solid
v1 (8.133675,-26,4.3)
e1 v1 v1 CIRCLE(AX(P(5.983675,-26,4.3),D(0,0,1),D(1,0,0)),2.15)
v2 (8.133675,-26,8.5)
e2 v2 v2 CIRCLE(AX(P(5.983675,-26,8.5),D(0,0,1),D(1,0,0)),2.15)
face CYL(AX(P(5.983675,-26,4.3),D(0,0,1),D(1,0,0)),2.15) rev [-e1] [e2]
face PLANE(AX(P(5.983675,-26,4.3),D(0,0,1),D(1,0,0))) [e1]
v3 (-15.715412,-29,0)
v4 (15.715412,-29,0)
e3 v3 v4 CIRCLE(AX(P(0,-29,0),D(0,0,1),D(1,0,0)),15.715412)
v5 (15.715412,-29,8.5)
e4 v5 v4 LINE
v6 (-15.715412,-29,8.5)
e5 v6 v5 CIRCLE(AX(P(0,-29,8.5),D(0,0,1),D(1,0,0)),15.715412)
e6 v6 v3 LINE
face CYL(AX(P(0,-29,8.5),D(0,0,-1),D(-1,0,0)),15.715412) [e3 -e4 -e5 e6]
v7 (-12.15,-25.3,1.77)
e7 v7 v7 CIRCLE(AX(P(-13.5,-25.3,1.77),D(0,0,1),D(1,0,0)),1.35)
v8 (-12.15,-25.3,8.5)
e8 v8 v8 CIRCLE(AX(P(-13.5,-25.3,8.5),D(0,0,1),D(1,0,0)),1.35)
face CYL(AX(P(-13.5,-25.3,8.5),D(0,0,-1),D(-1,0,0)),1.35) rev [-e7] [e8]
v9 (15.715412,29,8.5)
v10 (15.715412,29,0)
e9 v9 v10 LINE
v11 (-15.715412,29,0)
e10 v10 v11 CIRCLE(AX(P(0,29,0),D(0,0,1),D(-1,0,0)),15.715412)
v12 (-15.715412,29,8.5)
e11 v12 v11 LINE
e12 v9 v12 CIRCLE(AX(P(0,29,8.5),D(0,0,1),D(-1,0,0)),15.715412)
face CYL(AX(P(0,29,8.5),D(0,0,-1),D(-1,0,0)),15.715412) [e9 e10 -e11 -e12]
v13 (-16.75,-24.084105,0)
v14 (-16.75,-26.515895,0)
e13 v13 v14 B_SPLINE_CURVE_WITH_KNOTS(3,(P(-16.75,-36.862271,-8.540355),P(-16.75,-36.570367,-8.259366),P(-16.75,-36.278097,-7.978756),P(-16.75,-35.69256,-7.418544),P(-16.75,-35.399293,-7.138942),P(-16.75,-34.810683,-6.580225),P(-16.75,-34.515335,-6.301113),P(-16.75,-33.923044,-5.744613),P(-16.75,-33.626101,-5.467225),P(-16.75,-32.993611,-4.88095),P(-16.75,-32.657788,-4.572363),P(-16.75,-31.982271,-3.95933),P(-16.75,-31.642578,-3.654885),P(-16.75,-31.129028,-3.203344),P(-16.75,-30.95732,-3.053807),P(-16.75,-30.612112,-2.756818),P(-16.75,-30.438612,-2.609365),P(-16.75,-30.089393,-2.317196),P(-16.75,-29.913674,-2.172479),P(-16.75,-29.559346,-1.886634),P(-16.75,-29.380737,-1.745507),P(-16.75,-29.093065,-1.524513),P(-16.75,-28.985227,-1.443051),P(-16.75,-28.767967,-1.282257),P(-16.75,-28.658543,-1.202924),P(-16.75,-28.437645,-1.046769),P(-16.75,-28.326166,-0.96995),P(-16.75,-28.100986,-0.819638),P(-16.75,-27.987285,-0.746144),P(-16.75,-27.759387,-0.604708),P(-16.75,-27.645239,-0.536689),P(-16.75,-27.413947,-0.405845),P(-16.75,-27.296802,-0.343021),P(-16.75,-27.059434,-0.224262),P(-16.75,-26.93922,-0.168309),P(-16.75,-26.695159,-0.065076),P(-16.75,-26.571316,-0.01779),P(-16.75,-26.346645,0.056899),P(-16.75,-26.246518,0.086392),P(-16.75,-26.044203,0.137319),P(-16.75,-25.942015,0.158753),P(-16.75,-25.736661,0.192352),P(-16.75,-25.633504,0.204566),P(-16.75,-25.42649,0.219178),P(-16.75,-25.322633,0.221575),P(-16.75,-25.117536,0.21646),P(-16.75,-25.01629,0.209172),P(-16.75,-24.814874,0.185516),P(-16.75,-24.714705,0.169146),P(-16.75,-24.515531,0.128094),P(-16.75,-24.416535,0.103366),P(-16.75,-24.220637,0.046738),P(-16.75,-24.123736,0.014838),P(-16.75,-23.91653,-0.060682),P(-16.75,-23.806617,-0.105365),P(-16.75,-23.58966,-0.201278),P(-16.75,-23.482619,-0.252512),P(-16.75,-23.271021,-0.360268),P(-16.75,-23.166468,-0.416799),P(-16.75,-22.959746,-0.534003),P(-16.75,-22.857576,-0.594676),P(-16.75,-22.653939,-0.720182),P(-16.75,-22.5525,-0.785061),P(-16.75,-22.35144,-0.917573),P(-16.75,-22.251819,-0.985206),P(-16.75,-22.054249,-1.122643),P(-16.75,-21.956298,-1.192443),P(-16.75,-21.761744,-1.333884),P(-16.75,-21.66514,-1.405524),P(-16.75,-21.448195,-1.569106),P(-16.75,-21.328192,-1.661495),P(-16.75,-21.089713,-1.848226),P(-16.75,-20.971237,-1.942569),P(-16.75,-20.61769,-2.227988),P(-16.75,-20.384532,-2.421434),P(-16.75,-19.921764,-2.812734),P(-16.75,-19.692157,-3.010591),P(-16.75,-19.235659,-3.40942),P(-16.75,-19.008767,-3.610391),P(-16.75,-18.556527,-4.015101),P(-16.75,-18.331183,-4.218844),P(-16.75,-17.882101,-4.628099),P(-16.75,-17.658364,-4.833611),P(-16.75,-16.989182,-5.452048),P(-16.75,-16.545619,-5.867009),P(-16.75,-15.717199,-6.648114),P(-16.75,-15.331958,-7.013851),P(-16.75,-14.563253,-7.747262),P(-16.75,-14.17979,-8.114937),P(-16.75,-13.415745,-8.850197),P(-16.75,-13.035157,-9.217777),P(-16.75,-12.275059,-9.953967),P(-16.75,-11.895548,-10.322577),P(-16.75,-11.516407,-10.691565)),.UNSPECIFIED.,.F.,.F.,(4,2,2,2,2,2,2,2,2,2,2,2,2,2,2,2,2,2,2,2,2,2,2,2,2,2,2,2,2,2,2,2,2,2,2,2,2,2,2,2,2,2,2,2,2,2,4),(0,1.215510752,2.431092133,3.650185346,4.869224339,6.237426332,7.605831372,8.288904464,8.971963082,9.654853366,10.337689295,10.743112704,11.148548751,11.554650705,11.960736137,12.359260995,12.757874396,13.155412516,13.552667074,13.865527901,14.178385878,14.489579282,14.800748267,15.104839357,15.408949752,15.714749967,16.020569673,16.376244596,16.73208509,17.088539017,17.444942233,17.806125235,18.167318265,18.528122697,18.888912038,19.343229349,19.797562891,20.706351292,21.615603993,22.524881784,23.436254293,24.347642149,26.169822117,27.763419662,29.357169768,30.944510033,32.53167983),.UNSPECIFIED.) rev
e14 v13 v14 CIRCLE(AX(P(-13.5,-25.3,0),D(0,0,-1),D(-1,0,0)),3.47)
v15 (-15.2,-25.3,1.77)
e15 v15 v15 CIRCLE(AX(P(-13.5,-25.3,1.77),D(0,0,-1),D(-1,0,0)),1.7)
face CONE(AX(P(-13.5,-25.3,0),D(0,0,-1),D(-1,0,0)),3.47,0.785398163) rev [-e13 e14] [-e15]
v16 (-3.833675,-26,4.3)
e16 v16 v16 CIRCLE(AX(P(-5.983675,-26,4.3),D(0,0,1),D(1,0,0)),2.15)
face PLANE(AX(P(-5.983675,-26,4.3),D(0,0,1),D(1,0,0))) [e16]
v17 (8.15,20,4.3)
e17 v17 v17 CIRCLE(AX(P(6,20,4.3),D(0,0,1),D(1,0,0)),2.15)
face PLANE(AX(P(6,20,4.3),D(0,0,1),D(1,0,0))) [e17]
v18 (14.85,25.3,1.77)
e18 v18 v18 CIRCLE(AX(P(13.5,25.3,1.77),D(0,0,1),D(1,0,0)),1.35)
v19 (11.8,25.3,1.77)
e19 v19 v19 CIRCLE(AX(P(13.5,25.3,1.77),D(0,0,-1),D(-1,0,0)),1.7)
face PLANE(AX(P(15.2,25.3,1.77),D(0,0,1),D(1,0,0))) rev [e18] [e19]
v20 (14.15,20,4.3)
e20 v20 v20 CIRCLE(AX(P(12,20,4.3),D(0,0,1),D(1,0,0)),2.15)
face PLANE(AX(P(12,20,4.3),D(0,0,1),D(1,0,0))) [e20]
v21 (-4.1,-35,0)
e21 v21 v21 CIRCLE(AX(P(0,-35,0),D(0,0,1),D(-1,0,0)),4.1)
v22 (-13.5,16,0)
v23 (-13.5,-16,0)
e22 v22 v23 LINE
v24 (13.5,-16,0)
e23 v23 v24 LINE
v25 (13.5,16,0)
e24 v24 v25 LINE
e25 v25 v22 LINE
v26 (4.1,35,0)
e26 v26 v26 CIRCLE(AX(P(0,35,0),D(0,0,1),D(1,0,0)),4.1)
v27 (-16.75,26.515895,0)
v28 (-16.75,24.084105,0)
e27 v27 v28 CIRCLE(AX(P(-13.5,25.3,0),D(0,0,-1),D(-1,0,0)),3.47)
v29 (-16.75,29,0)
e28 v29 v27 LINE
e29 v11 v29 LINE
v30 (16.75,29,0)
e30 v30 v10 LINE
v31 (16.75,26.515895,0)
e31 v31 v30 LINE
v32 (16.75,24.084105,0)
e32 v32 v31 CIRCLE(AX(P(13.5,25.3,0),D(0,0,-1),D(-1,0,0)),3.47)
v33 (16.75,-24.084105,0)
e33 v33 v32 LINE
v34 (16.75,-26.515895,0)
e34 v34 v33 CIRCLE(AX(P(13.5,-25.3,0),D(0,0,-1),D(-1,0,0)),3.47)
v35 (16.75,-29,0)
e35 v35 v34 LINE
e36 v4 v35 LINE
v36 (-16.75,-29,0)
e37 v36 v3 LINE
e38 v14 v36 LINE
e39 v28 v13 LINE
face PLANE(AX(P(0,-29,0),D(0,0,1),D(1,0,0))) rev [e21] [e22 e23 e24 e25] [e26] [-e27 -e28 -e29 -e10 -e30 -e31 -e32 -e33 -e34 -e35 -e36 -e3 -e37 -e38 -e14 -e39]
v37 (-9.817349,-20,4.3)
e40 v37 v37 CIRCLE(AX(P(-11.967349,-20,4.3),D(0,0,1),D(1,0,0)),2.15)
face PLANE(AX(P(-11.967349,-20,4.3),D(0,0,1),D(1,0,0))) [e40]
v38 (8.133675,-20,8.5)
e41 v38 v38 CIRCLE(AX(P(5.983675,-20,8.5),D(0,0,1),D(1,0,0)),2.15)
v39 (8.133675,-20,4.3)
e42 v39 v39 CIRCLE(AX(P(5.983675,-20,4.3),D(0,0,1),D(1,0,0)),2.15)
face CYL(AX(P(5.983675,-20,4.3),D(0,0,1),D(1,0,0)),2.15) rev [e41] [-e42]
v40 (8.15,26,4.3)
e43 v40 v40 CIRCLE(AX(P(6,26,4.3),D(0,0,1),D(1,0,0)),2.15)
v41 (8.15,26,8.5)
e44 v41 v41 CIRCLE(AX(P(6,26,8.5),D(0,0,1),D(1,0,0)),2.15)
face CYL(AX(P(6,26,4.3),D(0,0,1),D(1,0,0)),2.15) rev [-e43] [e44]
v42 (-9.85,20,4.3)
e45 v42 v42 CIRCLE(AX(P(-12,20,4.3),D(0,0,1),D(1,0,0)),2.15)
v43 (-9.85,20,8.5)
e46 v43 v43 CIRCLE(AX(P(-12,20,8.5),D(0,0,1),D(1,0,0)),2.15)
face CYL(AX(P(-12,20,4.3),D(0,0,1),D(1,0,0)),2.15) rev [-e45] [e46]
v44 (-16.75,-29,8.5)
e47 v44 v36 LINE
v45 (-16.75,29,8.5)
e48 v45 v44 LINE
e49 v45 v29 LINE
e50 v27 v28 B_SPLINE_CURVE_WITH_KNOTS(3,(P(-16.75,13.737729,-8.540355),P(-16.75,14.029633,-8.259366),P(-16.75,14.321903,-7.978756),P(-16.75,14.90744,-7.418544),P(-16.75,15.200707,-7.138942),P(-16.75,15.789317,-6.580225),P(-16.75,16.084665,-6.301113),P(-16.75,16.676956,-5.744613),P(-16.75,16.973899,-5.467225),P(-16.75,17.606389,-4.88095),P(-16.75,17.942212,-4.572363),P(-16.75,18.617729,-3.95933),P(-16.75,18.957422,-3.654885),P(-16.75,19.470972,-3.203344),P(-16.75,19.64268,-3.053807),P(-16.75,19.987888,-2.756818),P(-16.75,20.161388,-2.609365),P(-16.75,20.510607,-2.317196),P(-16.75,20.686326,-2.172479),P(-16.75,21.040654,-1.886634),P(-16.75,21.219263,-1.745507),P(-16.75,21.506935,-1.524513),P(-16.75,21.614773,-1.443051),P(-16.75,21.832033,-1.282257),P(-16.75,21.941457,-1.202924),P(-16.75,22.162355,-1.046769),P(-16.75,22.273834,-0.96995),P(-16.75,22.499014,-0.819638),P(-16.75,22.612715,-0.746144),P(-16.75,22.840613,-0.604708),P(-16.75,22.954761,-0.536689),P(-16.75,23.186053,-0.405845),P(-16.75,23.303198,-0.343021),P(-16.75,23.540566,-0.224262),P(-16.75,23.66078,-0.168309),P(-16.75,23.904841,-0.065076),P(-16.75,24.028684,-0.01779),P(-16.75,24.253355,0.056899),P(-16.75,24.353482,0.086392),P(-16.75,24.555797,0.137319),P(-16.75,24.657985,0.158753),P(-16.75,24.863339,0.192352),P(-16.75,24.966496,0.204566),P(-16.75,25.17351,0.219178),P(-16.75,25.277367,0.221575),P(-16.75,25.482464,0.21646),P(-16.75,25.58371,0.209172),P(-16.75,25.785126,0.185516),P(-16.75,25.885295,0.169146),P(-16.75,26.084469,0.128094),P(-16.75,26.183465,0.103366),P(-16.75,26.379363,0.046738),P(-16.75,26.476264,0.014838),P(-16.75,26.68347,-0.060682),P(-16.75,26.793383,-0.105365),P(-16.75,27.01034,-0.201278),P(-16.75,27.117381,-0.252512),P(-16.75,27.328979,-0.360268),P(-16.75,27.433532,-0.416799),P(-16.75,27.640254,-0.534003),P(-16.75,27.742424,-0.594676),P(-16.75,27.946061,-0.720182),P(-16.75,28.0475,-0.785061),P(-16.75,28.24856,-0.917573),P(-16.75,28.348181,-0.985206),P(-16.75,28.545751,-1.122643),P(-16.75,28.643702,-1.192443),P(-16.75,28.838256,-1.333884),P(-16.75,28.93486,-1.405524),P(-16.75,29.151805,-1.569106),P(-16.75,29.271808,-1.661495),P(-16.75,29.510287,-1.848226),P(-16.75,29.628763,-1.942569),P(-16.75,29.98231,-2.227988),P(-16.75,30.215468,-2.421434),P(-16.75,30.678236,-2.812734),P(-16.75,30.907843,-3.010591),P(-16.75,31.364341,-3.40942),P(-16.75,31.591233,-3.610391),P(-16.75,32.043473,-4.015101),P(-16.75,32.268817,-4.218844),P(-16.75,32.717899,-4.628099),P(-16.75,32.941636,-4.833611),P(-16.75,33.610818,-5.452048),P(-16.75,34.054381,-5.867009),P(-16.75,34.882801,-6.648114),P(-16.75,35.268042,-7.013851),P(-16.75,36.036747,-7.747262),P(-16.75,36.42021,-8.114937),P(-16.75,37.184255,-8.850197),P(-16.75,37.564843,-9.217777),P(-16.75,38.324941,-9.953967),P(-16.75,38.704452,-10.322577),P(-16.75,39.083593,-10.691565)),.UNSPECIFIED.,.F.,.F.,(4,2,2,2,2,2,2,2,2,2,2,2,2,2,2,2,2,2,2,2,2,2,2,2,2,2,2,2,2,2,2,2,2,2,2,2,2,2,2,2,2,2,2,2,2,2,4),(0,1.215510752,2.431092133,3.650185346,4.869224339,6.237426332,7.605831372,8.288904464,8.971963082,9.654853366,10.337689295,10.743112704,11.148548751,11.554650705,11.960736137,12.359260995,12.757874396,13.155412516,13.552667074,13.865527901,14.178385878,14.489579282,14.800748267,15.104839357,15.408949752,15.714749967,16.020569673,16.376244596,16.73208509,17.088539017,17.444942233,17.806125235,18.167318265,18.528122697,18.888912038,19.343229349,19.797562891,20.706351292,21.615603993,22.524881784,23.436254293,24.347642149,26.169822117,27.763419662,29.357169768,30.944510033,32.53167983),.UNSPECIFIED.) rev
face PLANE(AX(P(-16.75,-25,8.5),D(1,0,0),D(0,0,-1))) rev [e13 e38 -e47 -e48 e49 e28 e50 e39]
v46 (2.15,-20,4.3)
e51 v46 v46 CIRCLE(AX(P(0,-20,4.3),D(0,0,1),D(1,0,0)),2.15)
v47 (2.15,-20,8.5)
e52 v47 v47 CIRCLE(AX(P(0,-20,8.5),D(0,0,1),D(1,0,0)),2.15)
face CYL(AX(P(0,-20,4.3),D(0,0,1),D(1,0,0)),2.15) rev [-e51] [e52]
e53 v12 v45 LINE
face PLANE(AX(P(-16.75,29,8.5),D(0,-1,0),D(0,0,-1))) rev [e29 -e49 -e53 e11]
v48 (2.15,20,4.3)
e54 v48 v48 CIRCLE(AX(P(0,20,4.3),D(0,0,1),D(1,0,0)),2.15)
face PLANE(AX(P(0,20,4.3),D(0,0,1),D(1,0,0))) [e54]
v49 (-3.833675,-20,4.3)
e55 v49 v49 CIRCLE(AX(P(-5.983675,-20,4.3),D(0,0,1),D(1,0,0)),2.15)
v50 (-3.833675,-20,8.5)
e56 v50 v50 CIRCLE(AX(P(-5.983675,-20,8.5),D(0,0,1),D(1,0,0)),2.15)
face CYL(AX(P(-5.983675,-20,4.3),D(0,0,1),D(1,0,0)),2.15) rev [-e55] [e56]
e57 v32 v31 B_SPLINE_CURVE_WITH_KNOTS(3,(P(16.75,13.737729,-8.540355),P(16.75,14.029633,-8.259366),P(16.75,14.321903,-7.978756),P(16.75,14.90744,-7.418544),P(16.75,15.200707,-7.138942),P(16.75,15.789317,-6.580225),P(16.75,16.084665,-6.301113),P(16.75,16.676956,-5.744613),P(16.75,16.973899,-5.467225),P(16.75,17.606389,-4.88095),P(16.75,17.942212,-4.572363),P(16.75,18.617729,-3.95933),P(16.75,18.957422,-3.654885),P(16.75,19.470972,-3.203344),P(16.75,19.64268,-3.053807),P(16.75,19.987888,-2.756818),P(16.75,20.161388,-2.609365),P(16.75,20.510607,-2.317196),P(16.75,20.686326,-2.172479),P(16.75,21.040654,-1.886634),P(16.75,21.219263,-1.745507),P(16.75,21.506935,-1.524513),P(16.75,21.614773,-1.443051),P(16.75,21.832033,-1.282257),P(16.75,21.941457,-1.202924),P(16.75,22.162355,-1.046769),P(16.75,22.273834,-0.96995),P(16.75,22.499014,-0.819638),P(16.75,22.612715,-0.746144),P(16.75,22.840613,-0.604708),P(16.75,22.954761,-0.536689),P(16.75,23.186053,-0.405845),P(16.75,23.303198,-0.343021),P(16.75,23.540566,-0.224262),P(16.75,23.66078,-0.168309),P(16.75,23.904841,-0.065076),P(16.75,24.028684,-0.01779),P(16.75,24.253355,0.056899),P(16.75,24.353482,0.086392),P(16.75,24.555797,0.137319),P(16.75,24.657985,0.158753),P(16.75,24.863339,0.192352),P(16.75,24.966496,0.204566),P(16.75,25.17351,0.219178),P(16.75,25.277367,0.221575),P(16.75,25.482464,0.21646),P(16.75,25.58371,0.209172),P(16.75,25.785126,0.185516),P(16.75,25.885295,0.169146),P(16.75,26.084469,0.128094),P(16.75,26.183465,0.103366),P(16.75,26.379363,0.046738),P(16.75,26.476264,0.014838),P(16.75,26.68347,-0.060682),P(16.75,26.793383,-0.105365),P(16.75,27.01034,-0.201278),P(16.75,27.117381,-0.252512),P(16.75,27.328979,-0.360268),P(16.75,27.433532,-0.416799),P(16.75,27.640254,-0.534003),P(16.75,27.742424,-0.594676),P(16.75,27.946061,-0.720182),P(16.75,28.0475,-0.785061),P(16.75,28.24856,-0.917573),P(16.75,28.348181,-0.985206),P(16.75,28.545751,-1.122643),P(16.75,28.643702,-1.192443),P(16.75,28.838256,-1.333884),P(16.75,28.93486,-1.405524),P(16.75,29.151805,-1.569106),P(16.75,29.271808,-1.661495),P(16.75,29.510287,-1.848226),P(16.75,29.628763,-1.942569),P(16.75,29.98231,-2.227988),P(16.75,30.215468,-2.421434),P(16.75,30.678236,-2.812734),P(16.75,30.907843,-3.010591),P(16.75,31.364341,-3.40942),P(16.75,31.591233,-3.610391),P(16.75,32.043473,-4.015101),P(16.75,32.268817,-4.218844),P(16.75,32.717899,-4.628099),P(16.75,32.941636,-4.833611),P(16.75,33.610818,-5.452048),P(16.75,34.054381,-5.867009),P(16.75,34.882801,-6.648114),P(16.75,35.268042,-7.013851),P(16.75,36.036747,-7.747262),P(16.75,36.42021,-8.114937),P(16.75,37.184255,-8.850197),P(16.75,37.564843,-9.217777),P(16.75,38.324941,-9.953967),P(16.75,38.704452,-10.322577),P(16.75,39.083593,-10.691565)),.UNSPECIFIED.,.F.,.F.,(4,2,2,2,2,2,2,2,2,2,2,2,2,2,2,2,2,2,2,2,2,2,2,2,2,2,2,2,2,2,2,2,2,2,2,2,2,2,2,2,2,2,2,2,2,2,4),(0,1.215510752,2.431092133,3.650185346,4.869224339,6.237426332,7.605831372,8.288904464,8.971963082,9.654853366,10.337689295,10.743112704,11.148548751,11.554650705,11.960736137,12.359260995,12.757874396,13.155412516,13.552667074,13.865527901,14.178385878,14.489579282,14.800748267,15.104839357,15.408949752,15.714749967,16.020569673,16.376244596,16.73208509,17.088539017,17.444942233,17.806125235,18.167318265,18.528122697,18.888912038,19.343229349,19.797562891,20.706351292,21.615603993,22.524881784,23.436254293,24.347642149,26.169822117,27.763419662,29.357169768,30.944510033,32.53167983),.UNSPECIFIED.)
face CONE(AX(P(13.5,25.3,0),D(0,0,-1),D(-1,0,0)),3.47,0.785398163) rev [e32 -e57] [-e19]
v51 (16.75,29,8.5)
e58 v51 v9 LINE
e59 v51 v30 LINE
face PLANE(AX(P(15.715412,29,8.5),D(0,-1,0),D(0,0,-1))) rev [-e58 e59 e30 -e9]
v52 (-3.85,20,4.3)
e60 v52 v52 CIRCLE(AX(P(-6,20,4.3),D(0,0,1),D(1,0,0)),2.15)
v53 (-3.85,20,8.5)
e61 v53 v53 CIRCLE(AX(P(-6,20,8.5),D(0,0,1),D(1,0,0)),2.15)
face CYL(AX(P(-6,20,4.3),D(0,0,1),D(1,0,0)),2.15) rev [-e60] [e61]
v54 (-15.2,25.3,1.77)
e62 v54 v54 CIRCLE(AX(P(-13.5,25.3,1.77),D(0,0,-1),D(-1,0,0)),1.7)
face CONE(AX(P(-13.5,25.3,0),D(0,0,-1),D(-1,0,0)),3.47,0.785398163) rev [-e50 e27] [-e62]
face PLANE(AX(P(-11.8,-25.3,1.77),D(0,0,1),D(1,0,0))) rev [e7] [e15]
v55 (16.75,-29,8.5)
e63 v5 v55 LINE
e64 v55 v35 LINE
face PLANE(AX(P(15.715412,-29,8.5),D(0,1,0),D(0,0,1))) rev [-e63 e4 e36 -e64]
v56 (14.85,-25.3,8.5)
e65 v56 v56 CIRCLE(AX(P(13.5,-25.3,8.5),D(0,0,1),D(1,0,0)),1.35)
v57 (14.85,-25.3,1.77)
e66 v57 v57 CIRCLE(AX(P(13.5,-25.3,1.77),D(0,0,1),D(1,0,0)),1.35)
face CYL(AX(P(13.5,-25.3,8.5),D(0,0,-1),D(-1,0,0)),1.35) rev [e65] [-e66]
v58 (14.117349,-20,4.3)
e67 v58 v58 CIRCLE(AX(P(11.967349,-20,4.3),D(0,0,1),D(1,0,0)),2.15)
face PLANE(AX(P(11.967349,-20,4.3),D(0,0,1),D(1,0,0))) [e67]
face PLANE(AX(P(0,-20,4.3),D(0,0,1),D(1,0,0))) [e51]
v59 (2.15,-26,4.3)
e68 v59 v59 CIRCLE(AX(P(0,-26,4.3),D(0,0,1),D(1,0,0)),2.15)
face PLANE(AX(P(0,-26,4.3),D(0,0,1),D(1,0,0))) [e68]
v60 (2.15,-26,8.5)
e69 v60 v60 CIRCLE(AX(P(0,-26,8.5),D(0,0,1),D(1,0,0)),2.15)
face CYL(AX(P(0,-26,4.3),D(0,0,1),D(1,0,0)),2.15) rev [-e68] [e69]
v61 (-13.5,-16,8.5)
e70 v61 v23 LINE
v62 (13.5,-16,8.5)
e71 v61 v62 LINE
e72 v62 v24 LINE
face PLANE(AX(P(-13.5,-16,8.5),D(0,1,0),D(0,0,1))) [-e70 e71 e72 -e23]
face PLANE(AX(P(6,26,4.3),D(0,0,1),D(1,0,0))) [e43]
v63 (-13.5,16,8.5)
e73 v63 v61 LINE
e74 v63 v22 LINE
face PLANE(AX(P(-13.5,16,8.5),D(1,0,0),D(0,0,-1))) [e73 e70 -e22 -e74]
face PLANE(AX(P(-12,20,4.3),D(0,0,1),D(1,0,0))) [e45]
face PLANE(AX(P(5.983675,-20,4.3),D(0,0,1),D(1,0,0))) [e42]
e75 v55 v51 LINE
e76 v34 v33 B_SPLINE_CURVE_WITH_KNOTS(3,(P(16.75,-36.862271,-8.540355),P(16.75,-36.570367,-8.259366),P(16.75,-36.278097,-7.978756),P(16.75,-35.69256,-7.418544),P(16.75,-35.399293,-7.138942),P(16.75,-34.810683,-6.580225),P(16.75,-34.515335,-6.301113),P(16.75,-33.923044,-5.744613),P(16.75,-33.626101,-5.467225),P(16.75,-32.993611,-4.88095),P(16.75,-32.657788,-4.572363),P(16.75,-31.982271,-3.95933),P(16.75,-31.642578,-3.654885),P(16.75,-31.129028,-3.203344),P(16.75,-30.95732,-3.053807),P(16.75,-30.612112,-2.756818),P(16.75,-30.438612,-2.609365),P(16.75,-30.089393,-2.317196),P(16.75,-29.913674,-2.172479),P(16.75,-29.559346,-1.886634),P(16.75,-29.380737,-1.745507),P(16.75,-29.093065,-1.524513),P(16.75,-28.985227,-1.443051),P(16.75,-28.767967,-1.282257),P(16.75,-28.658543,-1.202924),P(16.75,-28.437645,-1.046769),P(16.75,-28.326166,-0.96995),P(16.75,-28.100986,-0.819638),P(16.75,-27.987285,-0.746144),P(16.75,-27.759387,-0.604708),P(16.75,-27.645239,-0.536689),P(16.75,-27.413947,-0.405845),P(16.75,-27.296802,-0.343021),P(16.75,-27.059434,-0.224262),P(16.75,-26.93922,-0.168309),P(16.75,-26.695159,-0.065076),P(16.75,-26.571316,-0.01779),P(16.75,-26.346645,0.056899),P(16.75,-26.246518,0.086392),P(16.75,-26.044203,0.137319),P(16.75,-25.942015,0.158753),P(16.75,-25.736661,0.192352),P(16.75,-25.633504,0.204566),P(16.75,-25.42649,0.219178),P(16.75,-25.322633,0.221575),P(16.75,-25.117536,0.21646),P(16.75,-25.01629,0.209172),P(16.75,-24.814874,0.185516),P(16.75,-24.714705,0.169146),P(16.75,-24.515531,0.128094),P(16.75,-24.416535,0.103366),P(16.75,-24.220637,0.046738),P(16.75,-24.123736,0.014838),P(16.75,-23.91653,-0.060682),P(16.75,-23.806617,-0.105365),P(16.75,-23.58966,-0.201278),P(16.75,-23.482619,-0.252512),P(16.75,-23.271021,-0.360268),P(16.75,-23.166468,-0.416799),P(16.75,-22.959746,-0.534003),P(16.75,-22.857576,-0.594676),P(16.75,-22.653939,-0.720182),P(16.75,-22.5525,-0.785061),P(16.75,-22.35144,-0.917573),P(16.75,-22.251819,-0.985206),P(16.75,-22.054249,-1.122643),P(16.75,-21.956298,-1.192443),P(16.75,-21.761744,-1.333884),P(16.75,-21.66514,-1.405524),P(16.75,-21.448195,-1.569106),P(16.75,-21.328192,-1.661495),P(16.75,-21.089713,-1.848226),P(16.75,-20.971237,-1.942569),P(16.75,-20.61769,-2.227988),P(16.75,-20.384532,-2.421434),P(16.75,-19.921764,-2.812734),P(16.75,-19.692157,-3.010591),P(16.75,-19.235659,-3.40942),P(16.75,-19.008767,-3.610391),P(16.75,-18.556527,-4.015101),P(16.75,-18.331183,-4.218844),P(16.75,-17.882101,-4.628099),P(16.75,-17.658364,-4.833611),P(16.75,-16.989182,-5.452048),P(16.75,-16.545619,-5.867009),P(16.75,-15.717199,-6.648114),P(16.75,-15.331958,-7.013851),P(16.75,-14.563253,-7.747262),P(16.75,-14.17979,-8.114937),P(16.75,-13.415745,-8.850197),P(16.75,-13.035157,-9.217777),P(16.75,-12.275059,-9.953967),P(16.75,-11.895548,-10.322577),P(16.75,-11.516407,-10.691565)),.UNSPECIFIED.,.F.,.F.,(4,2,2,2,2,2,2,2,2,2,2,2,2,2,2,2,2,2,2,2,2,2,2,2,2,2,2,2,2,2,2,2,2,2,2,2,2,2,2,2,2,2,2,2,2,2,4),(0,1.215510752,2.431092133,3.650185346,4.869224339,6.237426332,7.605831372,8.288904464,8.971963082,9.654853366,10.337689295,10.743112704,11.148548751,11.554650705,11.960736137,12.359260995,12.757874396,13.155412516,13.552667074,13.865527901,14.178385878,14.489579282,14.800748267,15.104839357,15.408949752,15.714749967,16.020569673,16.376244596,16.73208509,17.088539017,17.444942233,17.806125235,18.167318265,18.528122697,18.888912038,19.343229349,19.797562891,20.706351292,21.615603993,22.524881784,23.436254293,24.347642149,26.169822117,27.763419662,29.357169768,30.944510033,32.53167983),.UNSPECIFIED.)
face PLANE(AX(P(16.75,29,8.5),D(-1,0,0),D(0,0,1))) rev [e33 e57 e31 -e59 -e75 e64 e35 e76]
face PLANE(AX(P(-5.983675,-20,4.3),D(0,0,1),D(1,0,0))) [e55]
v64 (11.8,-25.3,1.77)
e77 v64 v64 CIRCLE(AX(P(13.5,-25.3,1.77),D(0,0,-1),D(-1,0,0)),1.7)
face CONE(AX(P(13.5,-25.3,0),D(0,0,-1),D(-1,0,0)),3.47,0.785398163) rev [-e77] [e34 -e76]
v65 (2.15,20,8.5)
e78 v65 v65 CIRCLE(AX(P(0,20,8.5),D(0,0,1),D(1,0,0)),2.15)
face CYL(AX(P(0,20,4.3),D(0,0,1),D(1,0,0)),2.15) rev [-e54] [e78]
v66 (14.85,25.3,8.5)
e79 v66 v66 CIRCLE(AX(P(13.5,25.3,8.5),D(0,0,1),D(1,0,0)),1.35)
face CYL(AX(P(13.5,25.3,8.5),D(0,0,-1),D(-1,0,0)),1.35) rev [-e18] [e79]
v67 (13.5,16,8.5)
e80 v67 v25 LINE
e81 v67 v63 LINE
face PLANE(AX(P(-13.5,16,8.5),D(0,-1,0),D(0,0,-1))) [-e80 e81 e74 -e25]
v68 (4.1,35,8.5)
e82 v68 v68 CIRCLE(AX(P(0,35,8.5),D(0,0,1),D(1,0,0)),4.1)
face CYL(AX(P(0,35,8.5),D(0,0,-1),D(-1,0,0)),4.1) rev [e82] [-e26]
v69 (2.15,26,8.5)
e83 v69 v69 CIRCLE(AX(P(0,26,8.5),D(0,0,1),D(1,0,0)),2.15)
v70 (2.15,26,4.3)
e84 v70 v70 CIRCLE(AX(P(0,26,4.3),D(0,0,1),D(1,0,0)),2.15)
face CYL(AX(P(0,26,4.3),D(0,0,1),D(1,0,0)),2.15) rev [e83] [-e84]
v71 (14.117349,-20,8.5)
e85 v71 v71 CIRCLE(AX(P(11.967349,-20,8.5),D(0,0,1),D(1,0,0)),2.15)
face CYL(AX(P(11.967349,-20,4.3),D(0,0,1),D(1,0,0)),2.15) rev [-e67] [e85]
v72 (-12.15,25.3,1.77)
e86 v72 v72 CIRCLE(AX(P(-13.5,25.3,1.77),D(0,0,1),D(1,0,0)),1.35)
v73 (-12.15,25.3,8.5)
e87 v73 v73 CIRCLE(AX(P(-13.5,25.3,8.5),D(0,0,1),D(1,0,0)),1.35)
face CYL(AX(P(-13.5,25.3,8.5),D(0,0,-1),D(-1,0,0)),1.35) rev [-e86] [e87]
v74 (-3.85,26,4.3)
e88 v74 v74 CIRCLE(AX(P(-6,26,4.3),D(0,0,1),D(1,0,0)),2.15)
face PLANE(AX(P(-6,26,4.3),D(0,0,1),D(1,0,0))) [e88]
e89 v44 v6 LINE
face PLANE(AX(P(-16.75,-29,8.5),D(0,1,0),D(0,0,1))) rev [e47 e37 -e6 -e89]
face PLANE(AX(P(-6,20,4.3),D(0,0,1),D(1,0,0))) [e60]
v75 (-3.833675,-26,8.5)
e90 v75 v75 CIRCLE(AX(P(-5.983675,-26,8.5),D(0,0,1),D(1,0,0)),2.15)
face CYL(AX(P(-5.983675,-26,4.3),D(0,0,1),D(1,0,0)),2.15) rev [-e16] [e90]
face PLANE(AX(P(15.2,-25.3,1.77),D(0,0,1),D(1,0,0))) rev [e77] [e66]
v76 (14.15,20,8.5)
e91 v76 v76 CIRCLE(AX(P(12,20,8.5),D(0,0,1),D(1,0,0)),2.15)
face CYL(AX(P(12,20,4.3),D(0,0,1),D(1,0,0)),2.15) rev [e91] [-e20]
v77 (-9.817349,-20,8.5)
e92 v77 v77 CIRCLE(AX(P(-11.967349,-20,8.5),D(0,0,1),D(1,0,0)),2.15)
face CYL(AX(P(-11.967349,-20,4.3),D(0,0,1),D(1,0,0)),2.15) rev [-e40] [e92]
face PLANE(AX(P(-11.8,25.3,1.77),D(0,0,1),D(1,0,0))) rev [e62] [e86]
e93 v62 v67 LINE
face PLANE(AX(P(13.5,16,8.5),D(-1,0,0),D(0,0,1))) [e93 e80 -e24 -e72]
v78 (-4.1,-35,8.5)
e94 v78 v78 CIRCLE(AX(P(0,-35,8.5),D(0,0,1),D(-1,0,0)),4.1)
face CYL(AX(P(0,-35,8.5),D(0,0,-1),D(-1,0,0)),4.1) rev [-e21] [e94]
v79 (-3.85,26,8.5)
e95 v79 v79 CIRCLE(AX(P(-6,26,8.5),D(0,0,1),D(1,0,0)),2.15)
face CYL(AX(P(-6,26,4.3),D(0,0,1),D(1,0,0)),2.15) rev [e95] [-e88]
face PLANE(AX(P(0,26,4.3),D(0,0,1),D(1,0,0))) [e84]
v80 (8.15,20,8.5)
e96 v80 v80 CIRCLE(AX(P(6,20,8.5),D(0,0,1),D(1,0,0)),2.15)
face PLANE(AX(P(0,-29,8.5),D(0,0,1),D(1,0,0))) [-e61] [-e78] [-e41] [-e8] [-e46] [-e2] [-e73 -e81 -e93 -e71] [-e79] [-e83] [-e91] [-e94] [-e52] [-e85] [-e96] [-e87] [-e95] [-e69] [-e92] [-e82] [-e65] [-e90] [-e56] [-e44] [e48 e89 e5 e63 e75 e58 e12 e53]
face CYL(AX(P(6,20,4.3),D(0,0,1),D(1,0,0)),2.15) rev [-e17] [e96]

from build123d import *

# Parameters (mm, degrees)
SKETCH1_R                   = 1.35
SKETCH1_R_2                 = 4.1
SKETCH1_W                   = 27
SKETCH1_H                   = 32
BOSS_EXTRUDE1_DEPTH         = 8.5
SKETCH2_R                   = 2.15
CUT_EXTRUDE1_DEPTH          = 4.2
ADVANCEDHOLE1_OUTLINE_R     = 1.7
ADVANCEDHOLE1_OUTLINE_R_2   = 1.35
ADVANCEDHOLE1_DEPTH         = 1.77
ADVANCEDHOLE1_DRAFT         = 45
ADVANCEDHOLE1_2_OUTLINE_R   = 1.7
ADVANCEDHOLE1_2_OUTLINE_R_2 = 1.35
ADVANCEDHOLE1_2_DEPTH       = 1.77
ADVANCEDHOLE1_2_DRAFT       = 45
ADVANCEDHOLE1_3_OUTLINE_R   = 1.7
ADVANCEDHOLE1_3_OUTLINE_R_2 = 1.35
ADVANCEDHOLE1_3_DEPTH       = 1.77
ADVANCEDHOLE1_3_DRAFT       = 45
ADVANCEDHOLE1_4_OUTLINE_R   = 1.7
ADVANCEDHOLE1_4_OUTLINE_R_2 = 1.35
ADVANCEDHOLE1_4_DEPTH       = 1.77
ADVANCEDHOLE1_4_DRAFT       = 45


# Read off the part's stored shape, not the designer's step: AdvancedHole1
with BuildPart() as part:
    # Sketch1 → Boss-Extrude1 (new body)
    with BuildSketch(Plane.XY):
        with BuildLine():
            Line((-16.75, 29), (-15.715411776, 29))
            ThreePointArc((-15.715411776, 29), (0, 44.715411776), (15.715411776, 29))
            Line((15.715411776, 29), (16.75, 29))
            Line((16.75, 29), (16.75, 25))
            Line((16.75, 25), (16.75, -25))
            Line((16.75, -25), (16.75, -29))
            Line((16.75, -29), (15.715411776, -29))
            ThreePointArc((15.715411776, -29), (0, -44.715411776), (-15.715411776, -29))
            Line((-15.715411776, -29), (-16.75, -29))
            Line((-16.75, -29), (-16.75, -25))
            Line((-16.75, -25), (-16.75, 25))
            Line((-16.75, 25), (-16.75, 29))
        make_face()
        with Locations((-13.5, 25.3)):
            Circle(SKETCH1_R, mode=Mode.SUBTRACT)
        with Locations((13.5, -25.3)):
            Circle(SKETCH1_R, mode=Mode.SUBTRACT)
        with Locations((-13.5, -25.3)):
            Circle(SKETCH1_R, mode=Mode.SUBTRACT)
        with Locations((13.5, 25.3)):
            Circle(SKETCH1_R, mode=Mode.SUBTRACT)
        with Locations((0, 35)):
            Circle(SKETCH1_R_2, mode=Mode.SUBTRACT)
        with Locations(Location((0, -35, 0), (0, 0, 180))):
            Circle(SKETCH1_R_2, mode=Mode.SUBTRACT)
        Rectangle(SKETCH1_W, SKETCH1_H, mode=Mode.SUBTRACT)
    extrude(amount=BOSS_EXTRUDE1_DEPTH)

    # Sketch2 → Cut-Extrude1 (cut)
    with BuildSketch(Plane.XY.offset(8.5)):
        with Locations((-12, 20)):
            Circle(SKETCH2_R)
        with Locations((-6, 20)):
            Circle(SKETCH2_R)
        with Locations((0, 20)):
            Circle(SKETCH2_R)
        with Locations((6, 20)):
            Circle(SKETCH2_R)
        with Locations((12, 20)):
            Circle(SKETCH2_R)
        with Locations((-6, 26)):
            Circle(SKETCH2_R)
        with Locations((0, 26)):
            Circle(SKETCH2_R)
        with Locations((6, 26)):
            Circle(SKETCH2_R)
        with Locations((-11.967349369, -20)):
            Circle(SKETCH2_R)
        with Locations((-5.983674685, -20)):
            Circle(SKETCH2_R)
        with Locations((0, -20)):
            Circle(SKETCH2_R)
        with Locations((5.983674685, -20)):
            Circle(SKETCH2_R)
        with Locations((11.967349369, -20)):
            Circle(SKETCH2_R)
        with Locations((-5.983674685, -26)):
            Circle(SKETCH2_R)
        with Locations((0, -26)):
            Circle(SKETCH2_R)
        with Locations((5.983674685, -26)):
            Circle(SKETCH2_R)
    extrude(amount=-CUT_EXTRUDE1_DEPTH, mode=Mode.SUBTRACT)


with BuildPart() as advancedhole1_tool:
    # AdvancedHole1 outline → AdvancedHole1 (with draft: the straight prism first)
    with BuildSketch(Plane.XY.offset(1.77)):
        with Locations((-13.5, -25.3)):
            Circle(ADVANCEDHOLE1_OUTLINE_R)
        with Locations((-13.5, -25.3)):
            Circle(ADVANCEDHOLE1_OUTLINE_R_2, mode=Mode.SUBTRACT)
    extrude(amount=-ADVANCEDHOLE1_DEPTH)
    # AdvancedHole1: the draft: its side faces are tilted about the plane it starts from
    advancedhole1_sides = [advancedhole1_tool.faces().sort_by_distance(p)[0] for p in [
        (-15.2, -25.3, 0.885),
        (-14.85, -25.3, 0.885),
    ]]
    draft(advancedhole1_sides, Plane.XY.offset(1.77), ADVANCEDHOLE1_DRAFT)


with BuildPart() as part_1:
    add(part.part)

    # AdvancedHole1: cut by advancedhole1_tool
    add(advancedhole1_tool.part, mode=Mode.SUBTRACT)


with BuildPart() as advancedhole1_2_tool:
    # AdvancedHole1 2 outline → AdvancedHole1 2 (with draft: the straight prism first)
    with BuildSketch(Plane.XY.offset(1.77)):
        with Locations((13.5, -25.3)):
            Circle(ADVANCEDHOLE1_2_OUTLINE_R)
        with Locations((13.5, -25.3)):
            Circle(ADVANCEDHOLE1_2_OUTLINE_R_2, mode=Mode.SUBTRACT)
    extrude(amount=-ADVANCEDHOLE1_2_DEPTH)
    # AdvancedHole1 2: the draft: its side faces are tilted about the plane it starts from
    advancedhole1_2_sides = [advancedhole1_2_tool.faces().sort_by_distance(p)[0] for p in [
        (11.8, -25.3, 0.885),
        (12.15, -25.3, 0.885),
    ]]
    draft(advancedhole1_2_sides, Plane.XY.offset(1.77), ADVANCEDHOLE1_2_DRAFT)


with BuildPart() as part_2:
    add(part_1.part)

    # AdvancedHole1 2: cut by advancedhole1_2_tool
    add(advancedhole1_2_tool.part, mode=Mode.SUBTRACT)


with BuildPart() as advancedhole1_3_tool:
    # AdvancedHole1 3 outline → AdvancedHole1 3 (with draft: the straight prism first)
    with BuildSketch(Plane.XY.offset(1.77)):
        with Locations((13.5, 25.3)):
            Circle(ADVANCEDHOLE1_3_OUTLINE_R)
        with Locations((13.5, 25.3)):
            Circle(ADVANCEDHOLE1_3_OUTLINE_R_2, mode=Mode.SUBTRACT)
    extrude(amount=-ADVANCEDHOLE1_3_DEPTH)
    # AdvancedHole1 3: the draft: its side faces are tilted about the plane it starts from
    advancedhole1_3_sides = [advancedhole1_3_tool.faces().sort_by_distance(p)[0] for p in [
        (11.8, 25.3, 0.885),
        (12.15, 25.3, 0.885),
    ]]
    draft(advancedhole1_3_sides, Plane.XY.offset(1.77), ADVANCEDHOLE1_3_DRAFT)


with BuildPart() as part_3:
    add(part_2.part)

    # AdvancedHole1 3: cut by advancedhole1_3_tool
    add(advancedhole1_3_tool.part, mode=Mode.SUBTRACT)


with BuildPart() as advancedhole1_4_tool:
    # AdvancedHole1 4 outline → AdvancedHole1 4 (with draft: the straight prism first)
    with BuildSketch(Plane.XY.offset(1.77)):
        with Locations((-13.5, 25.3)):
            Circle(ADVANCEDHOLE1_4_OUTLINE_R)
        with Locations((-13.5, 25.3)):
            Circle(ADVANCEDHOLE1_4_OUTLINE_R_2, mode=Mode.SUBTRACT)
    extrude(amount=-ADVANCEDHOLE1_4_DEPTH)
    # AdvancedHole1 4: the draft: its side faces are tilted about the plane it starts from
    advancedhole1_4_sides = [advancedhole1_4_tool.faces().sort_by_distance(p)[0] for p in [
        (-15.2, 25.3, 0.885),
        (-14.85, 25.3, 0.885),
    ]]
    draft(advancedhole1_4_sides, Plane.XY.offset(1.77), ADVANCEDHOLE1_4_DRAFT)


with BuildPart() as part_4:
    add(part_3.part)

    # AdvancedHole1 4: cut by advancedhole1_4_tool
    add(advancedhole1_4_tool.part, mode=Mode.SUBTRACT)


solid = part_4.part
